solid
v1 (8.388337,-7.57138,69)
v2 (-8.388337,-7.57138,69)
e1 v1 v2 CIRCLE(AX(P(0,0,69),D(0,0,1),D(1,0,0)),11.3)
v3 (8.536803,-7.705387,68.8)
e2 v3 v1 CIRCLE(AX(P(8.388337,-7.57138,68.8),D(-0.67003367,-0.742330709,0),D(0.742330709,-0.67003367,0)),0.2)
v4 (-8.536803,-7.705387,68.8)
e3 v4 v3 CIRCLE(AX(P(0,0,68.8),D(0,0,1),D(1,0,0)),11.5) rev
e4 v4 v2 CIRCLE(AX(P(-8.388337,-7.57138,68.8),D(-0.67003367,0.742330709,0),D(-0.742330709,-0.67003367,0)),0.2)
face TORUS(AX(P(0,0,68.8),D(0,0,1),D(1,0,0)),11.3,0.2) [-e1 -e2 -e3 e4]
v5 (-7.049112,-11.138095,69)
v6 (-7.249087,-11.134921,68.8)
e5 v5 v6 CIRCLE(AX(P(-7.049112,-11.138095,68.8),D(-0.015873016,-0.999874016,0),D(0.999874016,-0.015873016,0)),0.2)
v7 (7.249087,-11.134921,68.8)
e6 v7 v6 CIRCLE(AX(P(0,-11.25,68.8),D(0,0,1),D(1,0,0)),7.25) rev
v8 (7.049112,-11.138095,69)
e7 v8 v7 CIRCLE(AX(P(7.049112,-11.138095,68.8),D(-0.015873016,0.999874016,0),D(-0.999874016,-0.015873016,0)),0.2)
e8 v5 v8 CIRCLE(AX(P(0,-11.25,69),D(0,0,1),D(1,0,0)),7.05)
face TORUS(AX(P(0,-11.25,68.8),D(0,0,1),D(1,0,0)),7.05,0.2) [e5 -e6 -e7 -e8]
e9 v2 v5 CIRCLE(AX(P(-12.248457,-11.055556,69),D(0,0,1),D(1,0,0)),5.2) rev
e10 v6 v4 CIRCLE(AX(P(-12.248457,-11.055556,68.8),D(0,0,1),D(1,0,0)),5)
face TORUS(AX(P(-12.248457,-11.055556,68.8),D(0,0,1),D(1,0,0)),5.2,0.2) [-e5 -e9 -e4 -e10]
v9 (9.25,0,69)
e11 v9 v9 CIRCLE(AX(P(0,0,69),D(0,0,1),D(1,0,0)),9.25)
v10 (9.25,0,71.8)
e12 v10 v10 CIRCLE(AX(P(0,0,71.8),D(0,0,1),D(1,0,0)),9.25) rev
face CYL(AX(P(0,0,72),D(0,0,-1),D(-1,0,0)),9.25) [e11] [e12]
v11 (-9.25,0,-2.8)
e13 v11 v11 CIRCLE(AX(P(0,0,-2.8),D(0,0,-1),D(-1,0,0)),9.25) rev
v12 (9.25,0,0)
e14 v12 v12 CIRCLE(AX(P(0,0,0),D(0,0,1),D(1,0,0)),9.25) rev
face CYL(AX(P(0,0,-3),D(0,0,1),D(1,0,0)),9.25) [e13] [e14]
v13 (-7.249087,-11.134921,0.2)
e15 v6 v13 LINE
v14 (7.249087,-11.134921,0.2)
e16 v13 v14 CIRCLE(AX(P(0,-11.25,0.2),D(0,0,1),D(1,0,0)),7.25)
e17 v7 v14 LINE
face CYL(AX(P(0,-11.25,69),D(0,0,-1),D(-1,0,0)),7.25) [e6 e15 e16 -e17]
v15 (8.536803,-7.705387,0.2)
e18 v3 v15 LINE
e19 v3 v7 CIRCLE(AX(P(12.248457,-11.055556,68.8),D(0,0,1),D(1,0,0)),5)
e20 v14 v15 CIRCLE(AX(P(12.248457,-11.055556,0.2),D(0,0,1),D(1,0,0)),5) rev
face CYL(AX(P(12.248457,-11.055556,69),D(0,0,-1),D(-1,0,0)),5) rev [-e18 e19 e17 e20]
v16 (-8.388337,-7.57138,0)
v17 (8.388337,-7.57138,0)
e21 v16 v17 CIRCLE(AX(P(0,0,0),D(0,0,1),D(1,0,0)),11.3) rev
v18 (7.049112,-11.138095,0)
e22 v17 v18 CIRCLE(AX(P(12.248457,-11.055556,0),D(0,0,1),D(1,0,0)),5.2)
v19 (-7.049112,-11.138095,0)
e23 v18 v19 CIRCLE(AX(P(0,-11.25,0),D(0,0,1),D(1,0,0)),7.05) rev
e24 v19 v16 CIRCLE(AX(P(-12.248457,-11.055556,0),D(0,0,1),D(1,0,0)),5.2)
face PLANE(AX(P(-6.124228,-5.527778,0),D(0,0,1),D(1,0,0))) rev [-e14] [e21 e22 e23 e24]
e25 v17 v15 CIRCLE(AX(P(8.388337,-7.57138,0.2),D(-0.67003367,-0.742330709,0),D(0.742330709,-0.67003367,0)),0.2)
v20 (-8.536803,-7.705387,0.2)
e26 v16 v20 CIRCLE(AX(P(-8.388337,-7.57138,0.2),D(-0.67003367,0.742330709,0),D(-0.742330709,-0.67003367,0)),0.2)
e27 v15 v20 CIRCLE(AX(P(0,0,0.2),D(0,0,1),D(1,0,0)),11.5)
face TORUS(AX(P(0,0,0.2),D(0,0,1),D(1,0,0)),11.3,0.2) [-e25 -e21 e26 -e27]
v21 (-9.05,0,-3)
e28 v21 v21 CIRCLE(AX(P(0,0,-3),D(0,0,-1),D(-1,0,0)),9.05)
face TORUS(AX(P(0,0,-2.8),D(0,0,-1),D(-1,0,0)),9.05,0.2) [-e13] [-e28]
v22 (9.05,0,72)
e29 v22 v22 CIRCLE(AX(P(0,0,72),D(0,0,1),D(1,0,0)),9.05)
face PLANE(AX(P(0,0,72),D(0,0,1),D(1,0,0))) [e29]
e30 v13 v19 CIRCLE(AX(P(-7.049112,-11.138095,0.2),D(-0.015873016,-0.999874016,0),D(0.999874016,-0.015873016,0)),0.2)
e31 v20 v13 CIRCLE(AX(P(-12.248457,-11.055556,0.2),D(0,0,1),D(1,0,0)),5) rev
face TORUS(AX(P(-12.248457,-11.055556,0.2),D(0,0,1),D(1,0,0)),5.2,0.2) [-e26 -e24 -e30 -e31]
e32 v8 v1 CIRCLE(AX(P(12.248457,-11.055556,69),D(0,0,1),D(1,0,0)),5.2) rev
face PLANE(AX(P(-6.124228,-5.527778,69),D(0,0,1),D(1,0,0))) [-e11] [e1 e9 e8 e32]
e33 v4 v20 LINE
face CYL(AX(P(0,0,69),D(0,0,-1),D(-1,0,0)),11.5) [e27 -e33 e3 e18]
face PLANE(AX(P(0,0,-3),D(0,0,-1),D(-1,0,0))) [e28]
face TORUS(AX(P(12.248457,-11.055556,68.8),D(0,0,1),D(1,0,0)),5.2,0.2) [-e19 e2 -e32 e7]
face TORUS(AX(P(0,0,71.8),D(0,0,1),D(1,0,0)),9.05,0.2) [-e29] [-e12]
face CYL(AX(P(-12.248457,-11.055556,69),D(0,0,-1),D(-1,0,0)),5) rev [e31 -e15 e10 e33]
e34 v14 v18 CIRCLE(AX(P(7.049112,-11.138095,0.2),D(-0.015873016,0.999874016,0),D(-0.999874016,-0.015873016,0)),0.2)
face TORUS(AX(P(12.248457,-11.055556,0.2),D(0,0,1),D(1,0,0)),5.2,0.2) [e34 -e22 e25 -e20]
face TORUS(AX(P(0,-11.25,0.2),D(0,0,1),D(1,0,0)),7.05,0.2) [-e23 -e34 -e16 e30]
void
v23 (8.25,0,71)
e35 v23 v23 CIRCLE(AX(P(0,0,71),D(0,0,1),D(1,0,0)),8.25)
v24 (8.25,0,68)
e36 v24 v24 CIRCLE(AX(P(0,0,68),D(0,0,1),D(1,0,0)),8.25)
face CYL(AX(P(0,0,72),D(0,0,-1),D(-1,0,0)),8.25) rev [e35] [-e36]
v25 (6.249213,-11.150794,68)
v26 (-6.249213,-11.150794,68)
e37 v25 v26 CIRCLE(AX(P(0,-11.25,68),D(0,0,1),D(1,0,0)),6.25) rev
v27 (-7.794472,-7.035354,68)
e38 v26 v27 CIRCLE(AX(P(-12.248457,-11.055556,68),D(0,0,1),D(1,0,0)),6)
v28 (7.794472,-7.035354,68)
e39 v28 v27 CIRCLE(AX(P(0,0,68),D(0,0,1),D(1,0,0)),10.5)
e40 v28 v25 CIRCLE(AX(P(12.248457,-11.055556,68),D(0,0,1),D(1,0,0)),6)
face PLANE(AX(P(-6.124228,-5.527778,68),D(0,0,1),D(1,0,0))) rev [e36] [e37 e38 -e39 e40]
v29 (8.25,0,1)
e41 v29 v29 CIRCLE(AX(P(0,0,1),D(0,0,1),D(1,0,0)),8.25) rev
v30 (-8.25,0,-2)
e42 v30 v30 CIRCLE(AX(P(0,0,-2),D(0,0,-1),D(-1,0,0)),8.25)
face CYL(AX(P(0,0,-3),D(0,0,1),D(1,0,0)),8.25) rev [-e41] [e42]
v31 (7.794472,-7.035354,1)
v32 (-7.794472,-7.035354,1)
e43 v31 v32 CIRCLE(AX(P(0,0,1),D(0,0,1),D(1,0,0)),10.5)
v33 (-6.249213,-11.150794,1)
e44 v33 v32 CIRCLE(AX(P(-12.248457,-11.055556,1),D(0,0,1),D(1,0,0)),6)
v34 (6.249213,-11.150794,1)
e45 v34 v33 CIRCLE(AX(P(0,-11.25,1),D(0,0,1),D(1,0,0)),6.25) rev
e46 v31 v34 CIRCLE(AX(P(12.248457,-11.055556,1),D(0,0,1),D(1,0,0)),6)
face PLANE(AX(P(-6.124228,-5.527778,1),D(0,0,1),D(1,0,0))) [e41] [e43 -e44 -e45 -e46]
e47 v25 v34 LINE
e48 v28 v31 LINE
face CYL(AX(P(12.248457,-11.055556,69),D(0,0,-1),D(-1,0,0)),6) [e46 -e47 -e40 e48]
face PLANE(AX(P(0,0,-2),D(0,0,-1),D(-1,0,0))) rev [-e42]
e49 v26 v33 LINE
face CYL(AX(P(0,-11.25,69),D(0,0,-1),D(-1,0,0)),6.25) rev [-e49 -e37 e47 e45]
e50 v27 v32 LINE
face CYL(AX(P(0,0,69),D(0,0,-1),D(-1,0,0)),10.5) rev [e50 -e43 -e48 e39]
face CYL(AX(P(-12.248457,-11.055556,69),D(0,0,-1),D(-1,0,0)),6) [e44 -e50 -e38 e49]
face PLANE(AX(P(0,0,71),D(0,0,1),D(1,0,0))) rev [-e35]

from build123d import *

# Parameters (mm, degrees)
EXTRUSION1_DEPTH   = 69
ESQUISSE2_R        = 9.25
BOSS_EXTRU_1_DEPTH = 3
BOSS_EXTRU_2_START = 3
ESQUISSE3_R        = 9.25
BOSS_EXTRU_2_DEPTH = 3
CONG_1_R           = 0.2
COQUE2_START       = 1
COQUE2_DEPTH       = 67
COQUE2_START_2     = -2
COQUE2_2_OUTLINE_R = 8.25
COQUE2_2_DEPTH     = 73


# Read off the part's stored shape, not the designer's step: Coque2
with BuildPart() as part:
    # Esquisse1 → Extrusion1 (new body)
    with BuildSketch(Plane.XY):
        with BuildLine():
            ThreePointArc((-8.53680315, -7.705387205), (-7.567547804, -9.297974269), (-7.249086614, -11.134920635))
            ThreePointArc((-7.249086614, -11.134920635), (0, -18.5), (7.249086614, -11.134920635))
            ThreePointArc((7.249086614, -11.134920635), (7.567547804, -9.297974269), (8.53680315, -7.705387205))
            ThreePointArc((8.53680315, -7.705387205), (0, 11.5), (-8.53680315, -7.705387205))
        make_face()
    extrude(amount=EXTRUSION1_DEPTH)

    # Esquisse2 → Boss.-Extru.1 (add)
    with BuildSketch(Plane.XY.offset(69)):
        Circle(ESQUISSE2_R)
    extrude(amount=BOSS_EXTRU_1_DEPTH)

    # Esquisse3 → Boss.-Extru.2 (add)
    with BuildSketch(Plane(origin=(0, 0, 0), x_dir=(-1, 0, 0), z_dir=(0, 0, -1)).offset(BOSS_EXTRU_2_START)):
        with Locations(Location((0, 0, 0), (0, 0, 180))):
            Circle(ESQUISSE3_R)
    extrude(amount=-BOSS_EXTRU_2_DEPTH)

    # Congé1
    cong_1_edges = [part.edges().sort_by_distance(p)[0] for p in [
        (0, -18.5, 69),
        (7.567547804, -9.297974269, 69),
        (-9.25, 0, 72),
        (-9.25, 0, -3),
        (0, 11.5, 69),
        (7.567547804, -9.297974269, 0),
        (0, -18.5, 0),
        (-7.567547804, -9.297974269, 0),
        (0, 11.5, 0),
        (-7.567547804, -9.297974269, 69),
    ]]
    fillet(cong_1_edges, radius=CONG_1_R)

    # Coque2 outline → Coque2 (cut)
    with BuildSketch(Plane.XY.offset(COQUE2_START)):
        with BuildLine():
            ThreePointArc((7.794472441, -7.035353535), (0, 10.5), (-7.794472441, -7.035353535))
            ThreePointArc((-7.794472441, -7.035353535), (-6.631366027, -8.946458012), (-6.249212598, -11.150793651))
            ThreePointArc((-6.249212598, -11.150793651), (0, -17.5), (6.249212598, -11.150793651))
            ThreePointArc((6.249212598, -11.150793651), (6.631366027, -8.946458012), (7.794472441, -7.035353535))
        make_face()
    extrude(amount=COQUE2_DEPTH, mode=Mode.SUBTRACT)

    # Coque2 2 outline → Coque2 2 (cut)
    with BuildSketch(Plane.XY.offset(COQUE2_START_2)):
        Circle(COQUE2_2_OUTLINE_R)
    extrude(amount=COQUE2_2_DEPTH, mode=Mode.SUBTRACT)


solid = part.part
